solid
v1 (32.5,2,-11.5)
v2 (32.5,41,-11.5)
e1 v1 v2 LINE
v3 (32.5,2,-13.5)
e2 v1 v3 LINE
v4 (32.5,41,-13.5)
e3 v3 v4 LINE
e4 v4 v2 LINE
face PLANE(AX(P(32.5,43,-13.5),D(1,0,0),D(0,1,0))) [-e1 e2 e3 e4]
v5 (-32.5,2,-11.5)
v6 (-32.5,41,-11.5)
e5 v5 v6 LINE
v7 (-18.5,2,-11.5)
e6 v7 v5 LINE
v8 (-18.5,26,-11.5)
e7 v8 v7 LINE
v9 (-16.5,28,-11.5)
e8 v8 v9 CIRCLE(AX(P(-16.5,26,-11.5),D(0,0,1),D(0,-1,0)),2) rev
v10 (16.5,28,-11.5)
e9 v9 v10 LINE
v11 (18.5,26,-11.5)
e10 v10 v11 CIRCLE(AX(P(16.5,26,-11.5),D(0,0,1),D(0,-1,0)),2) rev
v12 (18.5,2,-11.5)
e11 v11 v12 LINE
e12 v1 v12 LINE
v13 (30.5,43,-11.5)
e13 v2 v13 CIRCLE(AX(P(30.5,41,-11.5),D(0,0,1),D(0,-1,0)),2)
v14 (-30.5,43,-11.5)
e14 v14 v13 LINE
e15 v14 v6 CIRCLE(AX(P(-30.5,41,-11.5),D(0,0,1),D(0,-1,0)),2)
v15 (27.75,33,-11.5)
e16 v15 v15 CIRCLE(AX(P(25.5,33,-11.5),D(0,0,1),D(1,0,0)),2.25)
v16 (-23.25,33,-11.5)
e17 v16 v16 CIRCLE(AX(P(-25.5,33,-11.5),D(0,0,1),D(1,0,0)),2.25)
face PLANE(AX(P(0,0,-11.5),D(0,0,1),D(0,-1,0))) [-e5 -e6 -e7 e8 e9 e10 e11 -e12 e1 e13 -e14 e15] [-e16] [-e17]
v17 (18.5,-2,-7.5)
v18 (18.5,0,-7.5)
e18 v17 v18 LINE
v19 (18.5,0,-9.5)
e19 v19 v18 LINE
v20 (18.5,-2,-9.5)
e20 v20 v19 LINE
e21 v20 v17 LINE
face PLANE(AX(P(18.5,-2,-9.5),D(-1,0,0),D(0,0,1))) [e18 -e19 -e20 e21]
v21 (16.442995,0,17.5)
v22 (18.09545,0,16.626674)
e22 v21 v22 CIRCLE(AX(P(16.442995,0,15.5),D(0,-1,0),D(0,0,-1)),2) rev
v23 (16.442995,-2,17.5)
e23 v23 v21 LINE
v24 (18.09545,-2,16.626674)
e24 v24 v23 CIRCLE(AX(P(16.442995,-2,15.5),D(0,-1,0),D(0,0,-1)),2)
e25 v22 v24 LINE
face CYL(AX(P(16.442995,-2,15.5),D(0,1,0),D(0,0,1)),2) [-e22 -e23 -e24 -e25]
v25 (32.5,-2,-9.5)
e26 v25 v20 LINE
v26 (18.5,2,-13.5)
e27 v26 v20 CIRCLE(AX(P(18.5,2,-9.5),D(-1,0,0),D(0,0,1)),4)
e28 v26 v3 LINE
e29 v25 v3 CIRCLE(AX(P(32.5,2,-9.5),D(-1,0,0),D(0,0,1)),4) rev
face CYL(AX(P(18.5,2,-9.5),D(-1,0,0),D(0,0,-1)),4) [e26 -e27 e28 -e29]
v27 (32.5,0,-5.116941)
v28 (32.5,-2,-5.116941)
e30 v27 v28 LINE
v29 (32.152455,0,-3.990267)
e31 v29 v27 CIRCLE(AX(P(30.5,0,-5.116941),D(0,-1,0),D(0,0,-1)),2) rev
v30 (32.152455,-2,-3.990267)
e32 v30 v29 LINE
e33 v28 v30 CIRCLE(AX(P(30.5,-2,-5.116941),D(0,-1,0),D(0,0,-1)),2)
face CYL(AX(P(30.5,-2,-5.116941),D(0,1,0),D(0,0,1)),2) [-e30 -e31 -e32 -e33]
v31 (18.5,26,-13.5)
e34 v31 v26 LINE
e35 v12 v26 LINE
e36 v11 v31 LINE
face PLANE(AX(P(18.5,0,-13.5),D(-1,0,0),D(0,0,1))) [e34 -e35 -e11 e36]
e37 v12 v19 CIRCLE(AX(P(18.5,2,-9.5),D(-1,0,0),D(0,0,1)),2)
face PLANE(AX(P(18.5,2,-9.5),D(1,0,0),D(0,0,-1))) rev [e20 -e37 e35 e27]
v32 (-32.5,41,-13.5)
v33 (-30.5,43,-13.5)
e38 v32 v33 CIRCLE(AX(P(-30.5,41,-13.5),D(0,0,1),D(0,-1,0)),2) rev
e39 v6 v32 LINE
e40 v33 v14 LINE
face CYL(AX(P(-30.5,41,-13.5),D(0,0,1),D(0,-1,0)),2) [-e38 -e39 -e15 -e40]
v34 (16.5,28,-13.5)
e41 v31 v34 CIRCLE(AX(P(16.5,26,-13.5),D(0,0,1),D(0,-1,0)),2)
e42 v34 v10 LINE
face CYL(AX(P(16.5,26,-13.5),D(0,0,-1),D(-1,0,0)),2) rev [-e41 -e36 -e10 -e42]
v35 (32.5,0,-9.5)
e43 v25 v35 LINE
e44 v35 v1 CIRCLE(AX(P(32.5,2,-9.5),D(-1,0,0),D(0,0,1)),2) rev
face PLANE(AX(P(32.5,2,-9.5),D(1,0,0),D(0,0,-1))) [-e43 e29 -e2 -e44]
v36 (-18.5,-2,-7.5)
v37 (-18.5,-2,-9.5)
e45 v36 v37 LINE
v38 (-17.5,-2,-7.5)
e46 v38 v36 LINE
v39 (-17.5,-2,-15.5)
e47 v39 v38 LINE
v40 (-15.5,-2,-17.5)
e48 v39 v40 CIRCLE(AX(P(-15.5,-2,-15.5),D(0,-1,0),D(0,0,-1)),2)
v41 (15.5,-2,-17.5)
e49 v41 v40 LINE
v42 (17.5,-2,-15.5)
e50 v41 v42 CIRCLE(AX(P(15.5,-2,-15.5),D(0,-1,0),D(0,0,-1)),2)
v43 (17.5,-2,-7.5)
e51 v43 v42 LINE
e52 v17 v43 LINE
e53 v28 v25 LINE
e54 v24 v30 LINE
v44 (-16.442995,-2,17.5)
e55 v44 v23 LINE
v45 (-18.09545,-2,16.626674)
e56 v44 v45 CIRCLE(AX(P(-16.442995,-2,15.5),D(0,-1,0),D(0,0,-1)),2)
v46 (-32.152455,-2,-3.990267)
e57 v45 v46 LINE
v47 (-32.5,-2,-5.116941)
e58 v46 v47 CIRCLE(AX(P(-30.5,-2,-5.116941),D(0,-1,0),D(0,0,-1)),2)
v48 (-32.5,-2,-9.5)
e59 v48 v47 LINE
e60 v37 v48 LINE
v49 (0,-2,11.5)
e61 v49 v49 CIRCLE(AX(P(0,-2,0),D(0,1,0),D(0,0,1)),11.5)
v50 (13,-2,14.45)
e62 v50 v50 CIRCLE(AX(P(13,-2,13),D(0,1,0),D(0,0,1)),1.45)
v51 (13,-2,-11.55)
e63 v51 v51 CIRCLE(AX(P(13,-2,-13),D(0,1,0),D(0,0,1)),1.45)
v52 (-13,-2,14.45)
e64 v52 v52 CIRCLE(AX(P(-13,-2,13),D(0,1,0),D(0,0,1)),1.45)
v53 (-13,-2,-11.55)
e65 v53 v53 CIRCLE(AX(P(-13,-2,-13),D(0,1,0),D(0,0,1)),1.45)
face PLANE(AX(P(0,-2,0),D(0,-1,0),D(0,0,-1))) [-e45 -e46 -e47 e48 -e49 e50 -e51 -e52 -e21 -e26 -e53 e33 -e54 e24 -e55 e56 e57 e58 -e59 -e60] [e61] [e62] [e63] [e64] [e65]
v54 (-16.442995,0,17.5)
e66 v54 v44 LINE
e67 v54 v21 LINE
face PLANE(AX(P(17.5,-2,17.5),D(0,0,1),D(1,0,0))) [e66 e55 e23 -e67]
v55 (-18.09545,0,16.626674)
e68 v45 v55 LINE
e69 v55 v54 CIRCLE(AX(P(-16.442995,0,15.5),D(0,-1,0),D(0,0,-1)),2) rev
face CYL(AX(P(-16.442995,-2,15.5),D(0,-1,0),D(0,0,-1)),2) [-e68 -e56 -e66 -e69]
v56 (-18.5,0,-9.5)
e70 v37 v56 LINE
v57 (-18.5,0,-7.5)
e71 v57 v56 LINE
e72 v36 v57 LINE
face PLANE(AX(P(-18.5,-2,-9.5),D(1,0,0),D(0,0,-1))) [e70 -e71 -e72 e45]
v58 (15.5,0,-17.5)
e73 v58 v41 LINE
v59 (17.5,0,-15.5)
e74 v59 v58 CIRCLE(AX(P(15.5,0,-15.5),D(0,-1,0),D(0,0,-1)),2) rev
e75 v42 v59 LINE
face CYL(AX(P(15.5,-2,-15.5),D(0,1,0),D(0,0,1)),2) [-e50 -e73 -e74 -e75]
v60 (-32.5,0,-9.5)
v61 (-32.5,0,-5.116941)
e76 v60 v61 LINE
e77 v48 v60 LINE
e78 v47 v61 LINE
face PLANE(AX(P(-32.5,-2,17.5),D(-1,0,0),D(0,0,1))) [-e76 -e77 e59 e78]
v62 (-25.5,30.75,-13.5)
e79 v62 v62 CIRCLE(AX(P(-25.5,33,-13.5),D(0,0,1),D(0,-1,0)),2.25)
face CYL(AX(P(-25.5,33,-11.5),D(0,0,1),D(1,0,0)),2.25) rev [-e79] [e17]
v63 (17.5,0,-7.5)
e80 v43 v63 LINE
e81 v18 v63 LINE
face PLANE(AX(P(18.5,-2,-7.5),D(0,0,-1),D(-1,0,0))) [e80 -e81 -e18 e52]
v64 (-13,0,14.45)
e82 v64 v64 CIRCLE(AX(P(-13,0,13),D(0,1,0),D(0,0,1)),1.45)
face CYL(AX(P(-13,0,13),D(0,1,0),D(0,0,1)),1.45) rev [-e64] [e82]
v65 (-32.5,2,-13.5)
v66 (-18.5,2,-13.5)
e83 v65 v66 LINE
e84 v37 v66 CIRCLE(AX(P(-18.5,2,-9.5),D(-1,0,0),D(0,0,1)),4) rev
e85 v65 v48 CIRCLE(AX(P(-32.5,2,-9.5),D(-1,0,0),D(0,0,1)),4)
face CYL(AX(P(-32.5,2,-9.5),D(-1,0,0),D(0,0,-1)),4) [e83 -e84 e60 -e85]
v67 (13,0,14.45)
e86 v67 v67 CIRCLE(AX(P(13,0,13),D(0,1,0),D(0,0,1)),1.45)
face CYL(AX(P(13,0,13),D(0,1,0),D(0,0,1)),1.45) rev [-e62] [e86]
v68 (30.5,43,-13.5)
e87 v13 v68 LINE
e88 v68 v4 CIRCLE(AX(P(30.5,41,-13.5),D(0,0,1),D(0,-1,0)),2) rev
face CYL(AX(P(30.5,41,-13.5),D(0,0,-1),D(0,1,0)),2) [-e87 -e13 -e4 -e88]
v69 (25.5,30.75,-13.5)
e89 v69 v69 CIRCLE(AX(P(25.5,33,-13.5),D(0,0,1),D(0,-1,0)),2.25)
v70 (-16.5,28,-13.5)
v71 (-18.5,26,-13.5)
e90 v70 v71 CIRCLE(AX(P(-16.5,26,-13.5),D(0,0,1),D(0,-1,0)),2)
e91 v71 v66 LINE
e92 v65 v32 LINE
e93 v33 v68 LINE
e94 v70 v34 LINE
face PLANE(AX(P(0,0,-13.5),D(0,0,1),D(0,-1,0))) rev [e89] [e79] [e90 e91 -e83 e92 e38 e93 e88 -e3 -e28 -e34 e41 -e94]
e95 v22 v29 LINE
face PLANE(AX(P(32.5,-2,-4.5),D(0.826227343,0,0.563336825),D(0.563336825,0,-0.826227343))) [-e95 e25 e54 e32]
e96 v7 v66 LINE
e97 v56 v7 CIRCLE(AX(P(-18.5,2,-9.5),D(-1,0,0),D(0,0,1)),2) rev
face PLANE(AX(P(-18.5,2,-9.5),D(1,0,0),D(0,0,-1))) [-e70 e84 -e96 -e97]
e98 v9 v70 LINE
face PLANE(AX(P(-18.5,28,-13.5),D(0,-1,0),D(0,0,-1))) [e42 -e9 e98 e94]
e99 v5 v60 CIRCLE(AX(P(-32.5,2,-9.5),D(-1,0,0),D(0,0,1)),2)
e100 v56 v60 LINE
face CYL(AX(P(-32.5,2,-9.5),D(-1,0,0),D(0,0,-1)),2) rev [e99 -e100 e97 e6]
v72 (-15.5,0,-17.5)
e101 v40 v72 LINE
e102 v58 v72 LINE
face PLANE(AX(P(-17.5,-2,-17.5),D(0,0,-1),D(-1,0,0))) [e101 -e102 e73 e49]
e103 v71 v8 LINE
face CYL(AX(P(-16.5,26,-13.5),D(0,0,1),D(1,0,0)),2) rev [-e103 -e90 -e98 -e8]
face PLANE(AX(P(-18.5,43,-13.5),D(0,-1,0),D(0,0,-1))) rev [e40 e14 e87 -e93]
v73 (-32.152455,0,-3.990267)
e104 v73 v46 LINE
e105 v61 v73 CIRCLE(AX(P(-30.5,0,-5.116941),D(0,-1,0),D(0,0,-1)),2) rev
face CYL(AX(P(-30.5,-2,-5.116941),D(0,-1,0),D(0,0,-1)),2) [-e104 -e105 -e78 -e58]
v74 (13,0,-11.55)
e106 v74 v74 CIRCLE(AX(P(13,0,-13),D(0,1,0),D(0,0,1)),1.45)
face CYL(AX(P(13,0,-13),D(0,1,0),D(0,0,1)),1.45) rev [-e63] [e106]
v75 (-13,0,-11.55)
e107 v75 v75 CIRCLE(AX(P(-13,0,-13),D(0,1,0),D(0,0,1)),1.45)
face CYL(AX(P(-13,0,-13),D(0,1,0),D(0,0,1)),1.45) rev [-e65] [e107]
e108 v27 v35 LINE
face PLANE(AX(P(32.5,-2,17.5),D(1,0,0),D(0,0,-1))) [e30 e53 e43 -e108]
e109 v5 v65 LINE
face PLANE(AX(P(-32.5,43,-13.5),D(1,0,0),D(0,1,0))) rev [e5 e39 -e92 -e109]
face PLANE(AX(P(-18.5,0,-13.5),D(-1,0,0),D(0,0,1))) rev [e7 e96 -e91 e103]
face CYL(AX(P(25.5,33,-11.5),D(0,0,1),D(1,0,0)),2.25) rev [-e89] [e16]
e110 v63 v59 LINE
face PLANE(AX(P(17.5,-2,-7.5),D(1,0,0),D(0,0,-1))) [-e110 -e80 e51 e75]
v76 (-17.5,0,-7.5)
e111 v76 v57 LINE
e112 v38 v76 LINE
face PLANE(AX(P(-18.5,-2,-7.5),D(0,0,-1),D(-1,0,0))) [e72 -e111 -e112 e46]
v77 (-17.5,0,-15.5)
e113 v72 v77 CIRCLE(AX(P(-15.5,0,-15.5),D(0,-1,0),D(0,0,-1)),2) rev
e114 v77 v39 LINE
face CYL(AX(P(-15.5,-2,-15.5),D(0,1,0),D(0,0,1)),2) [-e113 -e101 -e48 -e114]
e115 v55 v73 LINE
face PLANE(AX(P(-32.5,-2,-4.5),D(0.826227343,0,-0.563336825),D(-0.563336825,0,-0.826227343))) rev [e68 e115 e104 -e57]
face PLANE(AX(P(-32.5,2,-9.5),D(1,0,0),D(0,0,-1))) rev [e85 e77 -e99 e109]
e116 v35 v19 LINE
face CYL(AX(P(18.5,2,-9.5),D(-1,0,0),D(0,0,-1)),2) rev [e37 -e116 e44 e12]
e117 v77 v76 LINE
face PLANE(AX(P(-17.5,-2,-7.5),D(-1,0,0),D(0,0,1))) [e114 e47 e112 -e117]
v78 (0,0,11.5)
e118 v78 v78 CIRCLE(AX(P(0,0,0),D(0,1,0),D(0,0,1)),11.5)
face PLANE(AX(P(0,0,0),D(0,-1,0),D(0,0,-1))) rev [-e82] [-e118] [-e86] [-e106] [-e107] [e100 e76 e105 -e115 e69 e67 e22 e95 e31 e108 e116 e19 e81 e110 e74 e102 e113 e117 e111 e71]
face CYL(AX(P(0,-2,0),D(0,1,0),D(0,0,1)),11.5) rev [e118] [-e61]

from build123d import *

# Parameters (mm, degrees)
BASE_FLANGE1_DEPTH         = 2
EDGE_FLANGE1_DEPTH         = 14
FILLET1_R                  = 2
SKETCH9_W                  = 37
SKETCH9_H                  = 15
BOSS_EXTRUDE1_DEPTH        = 2
FILLET2_R                  = 2
CUT_EXTRUDE1_DEPTH         = 2
FILLET3_R                  = 2
M2_5_CLEARANCE_HOLE1_D     = 2.9
M2_5_CLEARANCE_HOLE1_DEPTH = 2
M4_CLEARANCE_HOLE1_D       = 4.5
SKETCH15_R                 = 11.5
CUT_EXTRUDE2_DEPTH         = 10


# Sheet-metal steps are written as plain solids
with BuildPart() as part:
    # Sketch1 → Base-Flange1 (new body)
    with BuildSketch(Plane(origin=(0, 0, 0), x_dir=(1, 0, 0), z_dir=(0, 1, 0))):
        Polygon((-17.5, -17.5), (-32.5, -17.5), (-32.5, 9.5), (-18.5, 9.5), (-18.5, 7.5), (-17.5, 7.5), (-17.5, 8.5), (-17.5, 17.5), (17.5, 17.5), (17.5, 8.5), (17.5, 7.5), (18.5, 7.5), (18.5, 9.5), (32.5, 9.5), (32.5, -17.5), (17.5, -17.5), align=None)
    extrude(amount=-BASE_FLANGE1_DEPTH)

    # Edge-Flange1 section (across the edge) → Edge-Flange1 (add)
    with BuildSketch(Plane(origin=(-18.5, 0, -11.5), x_dir=(0, 0, 1), z_dir=(-1, 0, 0))):
        with BuildLine():
            Line((-2, 2), (-2, 43))
            Line((-2, 43), (0, 43))
            Line((0, 43), (0, 2))
            ThreePointArc((0, 2), (0.585786438, 0.585786438), (2, 0))
            Line((2, 0), (2, -2))
            ThreePointArc((2, -2), (-0.828427125, -0.828427125), (-2, 2))
        make_face()
    edge_flange1 = extrude(amount=EDGE_FLANGE1_DEPTH)

    # Mirror1: Edge-Flange1 across plane
    add(edge_flange1.mirror(Plane(origin=(0, 0, 0), x_dir=(0, 0, 1), z_dir=(1, 0, 0))))

    # Fillet1
    fillet1_edges = [part.edges().sort_by_distance(p)[0] for p in [
        (-17.5, -1, -17.5),
        (17.5, -1, -17.5),
    ]]
    fillet(fillet1_edges, radius=FILLET1_R)

    # Sketch9 → Boss-Extrude1 (add)
    with BuildSketch(Plane.XY.offset(-11.5)):
        with Locations((0, 35.5)):
            Rectangle(SKETCH9_W, SKETCH9_H)
    extrude(amount=-BOSS_EXTRUDE1_DEPTH)

    # Fillet2
    fillet2_edges = [part.edges().sort_by_distance(p)[0] for p in [
        (-18.5, 28, -12.5),
        (18.5, 28, -12.5),
        (-32.5, 43, -12.5),
        (32.5, 43, -12.5),
    ]]
    fillet(fillet2_edges, radius=FILLET2_R)

    # Sketch10 → Cut-Extrude1 (cut)
    with BuildSketch(Plane(origin=(0, 0, 0), x_dir=(1, 0, 0), z_dir=(0, 1, 0))):
        Polygon((-32.5, 4.5), (-17.5, -17.5), (-32.5, -17.5), align=None)
    cut_extrude1 = extrude(amount=-CUT_EXTRUDE1_DEPTH, mode=Mode.SUBTRACT)

    # Mirror2: Cut-Extrude1 across plane
    add(cut_extrude1.mirror(Plane(origin=(0, 0, 0), x_dir=(0, 0, 1), z_dir=(1, 0, 0))), mode=Mode.SUBTRACT)

    # Fillet3
    fillet3_edges = [part.edges().sort_by_distance(p)[0] for p in [
        (-32.5, -1, -4.5),
        (-17.5, -1, 17.5),
        (32.5, -1, -4.5),
        (17.5, -1, 17.5),
    ]]
    fillet(fillet3_edges, radius=FILLET3_R)

    # M2.5 Clearance Hole1
    with Locations(Plane(origin=(0, 0, 0), x_dir=(1, 0, 0), z_dir=(0, 1, 0))):
        with Locations((13, -13), (-13, -13), (-13, 13), (13, 13)):
            Hole(M2_5_CLEARANCE_HOLE1_D / 2, depth=M2_5_CLEARANCE_HOLE1_DEPTH)

    # M4 Clearance Hole1 (through all)
    with Locations(Plane.XY.offset(-11.5)):
        with Locations((-25.5, 33), (25.5, 33)):
            Hole(M4_CLEARANCE_HOLE1_D / 2)

    # Sketch15 → Cut-Extrude2 (cut)
    with BuildSketch(Plane(origin=(0, 0, 0), x_dir=(1, 0, 0), z_dir=(0, 1, 0))):
        with Locations(Location((0, 0, 0), (0, 0, 270))):
            Circle(SKETCH15_R)
    extrude(amount=-CUT_EXTRUDE2_DEPTH, mode=Mode.SUBTRACT)


solid = part.part
